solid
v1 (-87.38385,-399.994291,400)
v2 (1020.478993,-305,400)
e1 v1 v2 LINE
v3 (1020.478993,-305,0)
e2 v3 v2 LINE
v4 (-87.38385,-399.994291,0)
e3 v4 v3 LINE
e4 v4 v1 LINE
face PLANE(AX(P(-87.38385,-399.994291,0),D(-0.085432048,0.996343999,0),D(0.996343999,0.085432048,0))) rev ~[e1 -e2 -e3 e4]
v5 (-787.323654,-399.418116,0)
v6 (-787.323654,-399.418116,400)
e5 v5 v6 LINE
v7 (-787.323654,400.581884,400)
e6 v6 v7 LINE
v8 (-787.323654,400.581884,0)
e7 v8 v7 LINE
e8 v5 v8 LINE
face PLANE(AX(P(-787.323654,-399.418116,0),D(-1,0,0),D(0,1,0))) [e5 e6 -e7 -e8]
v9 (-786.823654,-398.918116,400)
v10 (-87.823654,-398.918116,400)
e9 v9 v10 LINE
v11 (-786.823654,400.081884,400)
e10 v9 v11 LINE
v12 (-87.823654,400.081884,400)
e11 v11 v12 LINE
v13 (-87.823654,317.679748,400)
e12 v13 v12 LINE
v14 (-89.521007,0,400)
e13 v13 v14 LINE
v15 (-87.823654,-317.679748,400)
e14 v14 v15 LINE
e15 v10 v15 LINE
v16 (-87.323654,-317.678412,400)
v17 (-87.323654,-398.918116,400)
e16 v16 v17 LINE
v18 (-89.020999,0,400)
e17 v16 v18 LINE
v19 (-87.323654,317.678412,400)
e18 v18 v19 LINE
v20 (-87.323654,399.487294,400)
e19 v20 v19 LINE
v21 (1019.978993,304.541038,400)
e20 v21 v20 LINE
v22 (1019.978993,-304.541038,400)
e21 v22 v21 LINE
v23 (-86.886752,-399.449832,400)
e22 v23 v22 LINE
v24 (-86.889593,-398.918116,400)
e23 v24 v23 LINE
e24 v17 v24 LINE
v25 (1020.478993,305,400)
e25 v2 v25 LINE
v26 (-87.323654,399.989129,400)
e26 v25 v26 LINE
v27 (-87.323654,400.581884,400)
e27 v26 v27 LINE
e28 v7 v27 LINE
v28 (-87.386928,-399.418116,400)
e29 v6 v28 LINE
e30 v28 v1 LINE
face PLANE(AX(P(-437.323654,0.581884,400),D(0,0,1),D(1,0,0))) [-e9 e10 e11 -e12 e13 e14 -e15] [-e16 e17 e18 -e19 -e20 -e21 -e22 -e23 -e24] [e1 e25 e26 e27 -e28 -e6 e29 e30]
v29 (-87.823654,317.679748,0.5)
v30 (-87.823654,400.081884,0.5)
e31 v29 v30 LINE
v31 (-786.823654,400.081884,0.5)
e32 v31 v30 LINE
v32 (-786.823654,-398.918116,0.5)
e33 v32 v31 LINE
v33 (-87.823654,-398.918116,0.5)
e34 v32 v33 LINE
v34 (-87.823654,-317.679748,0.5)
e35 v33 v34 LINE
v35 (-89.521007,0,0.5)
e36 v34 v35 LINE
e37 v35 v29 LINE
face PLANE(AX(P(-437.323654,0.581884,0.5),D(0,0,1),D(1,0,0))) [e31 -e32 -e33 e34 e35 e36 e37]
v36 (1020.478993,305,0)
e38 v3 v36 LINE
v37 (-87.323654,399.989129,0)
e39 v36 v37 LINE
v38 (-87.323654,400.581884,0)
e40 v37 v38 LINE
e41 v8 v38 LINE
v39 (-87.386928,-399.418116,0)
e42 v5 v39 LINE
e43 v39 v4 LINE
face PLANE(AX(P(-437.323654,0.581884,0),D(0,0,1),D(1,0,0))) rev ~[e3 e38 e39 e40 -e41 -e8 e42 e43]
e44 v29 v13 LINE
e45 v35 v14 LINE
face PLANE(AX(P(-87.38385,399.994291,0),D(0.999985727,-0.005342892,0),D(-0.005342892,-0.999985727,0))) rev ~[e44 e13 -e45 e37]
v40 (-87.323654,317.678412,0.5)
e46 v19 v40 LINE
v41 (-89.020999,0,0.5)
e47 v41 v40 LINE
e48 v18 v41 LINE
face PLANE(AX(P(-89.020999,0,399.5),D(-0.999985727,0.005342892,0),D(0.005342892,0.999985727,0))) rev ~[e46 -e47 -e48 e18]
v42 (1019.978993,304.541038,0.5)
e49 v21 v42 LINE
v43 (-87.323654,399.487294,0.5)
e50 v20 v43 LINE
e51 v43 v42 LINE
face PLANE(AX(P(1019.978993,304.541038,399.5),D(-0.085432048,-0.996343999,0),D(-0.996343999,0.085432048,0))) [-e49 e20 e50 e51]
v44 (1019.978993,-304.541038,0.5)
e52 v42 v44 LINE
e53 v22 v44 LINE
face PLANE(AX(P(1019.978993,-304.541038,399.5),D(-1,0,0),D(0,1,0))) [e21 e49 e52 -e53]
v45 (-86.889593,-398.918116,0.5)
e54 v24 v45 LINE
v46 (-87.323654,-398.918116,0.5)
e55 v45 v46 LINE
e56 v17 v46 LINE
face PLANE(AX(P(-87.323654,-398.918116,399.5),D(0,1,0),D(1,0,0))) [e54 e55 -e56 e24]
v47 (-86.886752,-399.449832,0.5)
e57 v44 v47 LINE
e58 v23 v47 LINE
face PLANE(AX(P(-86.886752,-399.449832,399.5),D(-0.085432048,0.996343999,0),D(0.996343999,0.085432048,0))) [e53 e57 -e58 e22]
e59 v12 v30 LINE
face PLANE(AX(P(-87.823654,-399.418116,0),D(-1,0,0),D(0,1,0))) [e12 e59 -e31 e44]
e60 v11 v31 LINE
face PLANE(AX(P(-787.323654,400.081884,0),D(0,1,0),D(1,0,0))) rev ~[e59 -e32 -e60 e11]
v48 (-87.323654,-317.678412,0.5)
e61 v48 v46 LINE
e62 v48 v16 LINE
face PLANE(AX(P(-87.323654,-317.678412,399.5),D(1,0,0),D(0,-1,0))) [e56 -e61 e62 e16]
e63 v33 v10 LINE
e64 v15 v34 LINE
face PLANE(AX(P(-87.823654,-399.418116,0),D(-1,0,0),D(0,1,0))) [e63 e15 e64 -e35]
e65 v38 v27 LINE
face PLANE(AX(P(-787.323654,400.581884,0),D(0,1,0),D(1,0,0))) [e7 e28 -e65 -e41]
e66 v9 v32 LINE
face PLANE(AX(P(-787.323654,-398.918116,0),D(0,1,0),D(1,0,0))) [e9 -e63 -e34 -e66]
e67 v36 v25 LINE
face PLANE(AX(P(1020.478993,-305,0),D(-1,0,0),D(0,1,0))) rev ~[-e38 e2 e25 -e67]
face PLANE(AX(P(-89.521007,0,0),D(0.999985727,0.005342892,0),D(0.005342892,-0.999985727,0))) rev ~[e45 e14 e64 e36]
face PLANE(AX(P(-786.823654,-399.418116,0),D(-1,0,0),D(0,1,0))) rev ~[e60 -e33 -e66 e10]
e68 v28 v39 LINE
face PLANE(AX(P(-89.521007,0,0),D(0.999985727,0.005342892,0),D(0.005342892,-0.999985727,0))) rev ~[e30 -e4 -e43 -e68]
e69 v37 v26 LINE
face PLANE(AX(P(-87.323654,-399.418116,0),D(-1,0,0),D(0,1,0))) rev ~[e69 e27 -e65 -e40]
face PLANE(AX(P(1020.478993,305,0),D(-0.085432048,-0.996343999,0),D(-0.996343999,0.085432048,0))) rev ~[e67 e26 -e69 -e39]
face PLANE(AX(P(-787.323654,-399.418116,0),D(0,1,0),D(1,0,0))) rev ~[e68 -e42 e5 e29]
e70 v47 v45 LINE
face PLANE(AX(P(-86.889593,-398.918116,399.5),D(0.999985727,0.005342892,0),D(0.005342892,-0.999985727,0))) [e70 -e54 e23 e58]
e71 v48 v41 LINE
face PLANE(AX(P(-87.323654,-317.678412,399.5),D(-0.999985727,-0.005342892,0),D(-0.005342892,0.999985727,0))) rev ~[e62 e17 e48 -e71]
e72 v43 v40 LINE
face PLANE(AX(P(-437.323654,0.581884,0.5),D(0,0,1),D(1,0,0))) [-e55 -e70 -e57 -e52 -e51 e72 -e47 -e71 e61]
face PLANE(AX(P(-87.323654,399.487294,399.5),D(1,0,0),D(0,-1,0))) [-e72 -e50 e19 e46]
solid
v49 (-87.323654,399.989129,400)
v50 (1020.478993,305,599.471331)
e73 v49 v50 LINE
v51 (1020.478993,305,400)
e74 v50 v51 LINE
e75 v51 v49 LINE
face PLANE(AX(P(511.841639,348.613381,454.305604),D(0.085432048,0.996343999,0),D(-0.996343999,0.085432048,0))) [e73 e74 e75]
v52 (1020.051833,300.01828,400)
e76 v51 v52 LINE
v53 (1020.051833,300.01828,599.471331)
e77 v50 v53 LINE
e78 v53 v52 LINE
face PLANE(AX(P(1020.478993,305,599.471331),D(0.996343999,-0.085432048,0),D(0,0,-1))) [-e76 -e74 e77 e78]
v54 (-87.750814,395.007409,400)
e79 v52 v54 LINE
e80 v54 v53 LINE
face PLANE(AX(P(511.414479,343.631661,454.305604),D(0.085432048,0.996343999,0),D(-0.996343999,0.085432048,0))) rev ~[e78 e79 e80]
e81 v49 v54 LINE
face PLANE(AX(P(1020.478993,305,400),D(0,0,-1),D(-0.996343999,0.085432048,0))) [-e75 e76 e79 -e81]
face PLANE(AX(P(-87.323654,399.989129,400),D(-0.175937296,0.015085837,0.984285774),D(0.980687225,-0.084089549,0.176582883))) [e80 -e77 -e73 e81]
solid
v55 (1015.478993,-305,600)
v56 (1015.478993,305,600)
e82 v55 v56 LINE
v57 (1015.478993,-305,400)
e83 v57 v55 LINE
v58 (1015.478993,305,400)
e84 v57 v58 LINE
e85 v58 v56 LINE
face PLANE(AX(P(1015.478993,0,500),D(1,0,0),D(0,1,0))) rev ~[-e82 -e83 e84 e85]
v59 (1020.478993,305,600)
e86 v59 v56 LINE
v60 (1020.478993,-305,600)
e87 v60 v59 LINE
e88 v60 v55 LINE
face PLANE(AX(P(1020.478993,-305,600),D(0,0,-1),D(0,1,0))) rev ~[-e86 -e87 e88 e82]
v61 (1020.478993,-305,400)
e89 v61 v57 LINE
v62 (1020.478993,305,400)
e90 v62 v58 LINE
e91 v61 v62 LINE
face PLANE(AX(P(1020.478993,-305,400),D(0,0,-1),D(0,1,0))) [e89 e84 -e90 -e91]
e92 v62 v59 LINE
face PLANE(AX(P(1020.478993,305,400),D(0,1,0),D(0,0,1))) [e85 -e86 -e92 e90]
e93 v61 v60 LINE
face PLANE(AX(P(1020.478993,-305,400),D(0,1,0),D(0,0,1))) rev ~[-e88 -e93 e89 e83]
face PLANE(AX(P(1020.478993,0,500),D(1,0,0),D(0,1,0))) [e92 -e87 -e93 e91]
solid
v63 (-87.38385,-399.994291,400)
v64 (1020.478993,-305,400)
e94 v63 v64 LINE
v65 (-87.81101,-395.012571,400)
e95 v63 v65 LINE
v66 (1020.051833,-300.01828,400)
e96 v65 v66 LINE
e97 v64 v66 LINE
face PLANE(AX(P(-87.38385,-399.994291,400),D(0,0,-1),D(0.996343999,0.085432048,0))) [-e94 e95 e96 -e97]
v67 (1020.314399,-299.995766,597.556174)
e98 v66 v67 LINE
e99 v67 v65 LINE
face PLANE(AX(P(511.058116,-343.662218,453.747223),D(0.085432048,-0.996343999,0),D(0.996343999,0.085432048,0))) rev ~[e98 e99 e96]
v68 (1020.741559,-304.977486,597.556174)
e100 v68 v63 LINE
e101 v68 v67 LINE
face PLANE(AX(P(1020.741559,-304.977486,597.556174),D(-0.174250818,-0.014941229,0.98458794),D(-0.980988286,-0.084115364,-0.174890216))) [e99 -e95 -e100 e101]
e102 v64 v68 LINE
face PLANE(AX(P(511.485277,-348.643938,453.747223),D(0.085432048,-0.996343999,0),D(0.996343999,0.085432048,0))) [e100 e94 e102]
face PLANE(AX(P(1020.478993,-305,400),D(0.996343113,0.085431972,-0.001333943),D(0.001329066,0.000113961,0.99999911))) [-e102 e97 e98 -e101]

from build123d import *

# Parameters (mm, degrees)
F1_W      = 700
F1_H      = 800
F2_DEPTH  = 400
F3_T      = -0.5
F4_DEPTH  = 400
F5_T      = -0.5
F8_DEPTH  = 5
F6_W      = 610
F6_H      = 200
F9_DEPTH  = 5
F11_DEPTH = 5


# Not quite as in the source:
# - a shell that OpenCascade refuses in one call is made with other operations: the cavity is built on its own and cut out


with BuildPart() as f2:
    # F1 (on Top) → F2 (new body)
    with BuildSketch(Plane.XY):
        with Locations((-437.323653698, 0.5818843842)):
            Rectangle(F1_W, F1_H)
    extrude(amount=F2_DEPTH)

    # F3
    f3_openings = [f2.faces().sort_by_distance(p)[0] for p in [
        (-437.323654, 0.581884, 400),
    ]]
    offset(amount=F3_T, openings=f3_openings)

    # F0 (on Top) → F4 (join)
    with BuildSketch(Plane.XY):
        Polygon((-87.3838496962, 399.99429066), (-89.5210065554, 0), (1020.4789934446, 0), (1020.4789934446, 305), align=None)
        Polygon((-89.5210065554, 0), (-87.3838496962, -399.99429066), (1020.4789934446, -305), (1020.4789934446, 0), align=None)
    extrude(amount=F4_DEPTH)

    # F5: a shell. OpenCascade refuses it in one call, so the cavity is built on its own and cut out:
    # the body offset inwards by the wall thickness, plus a prism from it out through each open face.
    f5_core = offset(f2.part, amount=F5_T, kind=Kind.INTERSECTION, mode=Mode.PRIVATE)
    f5_exits = [f5_core.faces().sort_by_distance(p)[0] for p in [
        (441.073229, 0.000123, 399.5),
    ]]
    add(f5_core, mode=Mode.SUBTRACT)
    extrude(f5_exits, amount=-F5_T, mode=Mode.SUBTRACT)


with BuildPart() as f8:
    # F7 (on face) → F8 (new body)
    with BuildSketch(Plane(origin=(33.409614528, -389.6367906126, 0), x_dir=(0.9963439994, 0.0854320479, 0), z_dir=(0.0854320479, -0.9963439994, 0))):
        Polygon((990.954875946, 597.5561738014), (-121.2367056898, 400), (990.6913470501, 400), align=None)
    extrude(amount=-F8_DEPTH)


with BuildPart() as f9:
    # F6 (on face) → F9 (new body)
    with BuildSketch(Plane.YZ.offset(1020.4789934446)):
        with Locations((0, 500)):
            Rectangle(F6_W, F6_H)
    extrude(amount=-F9_DEPTH)


with BuildPart() as f11:
    # F10 (on face) → F11 (new body)
    with BuildSketch(Plane(origin=(33.409614528, 389.6367906126, 0), x_dir=(-0.9963439994, 0.0854320479, 0), z_dir=(0.0854320479, 0.9963439994, 0))):
        Polygon((121.1762888074, 400), (-990.6913470501, 599.4713306427), (-990.6913470501, 400), align=None)
    extrude(amount=-F11_DEPTH)


solid = Compound([f2.part, f8.part, f9.part, f11.part])
